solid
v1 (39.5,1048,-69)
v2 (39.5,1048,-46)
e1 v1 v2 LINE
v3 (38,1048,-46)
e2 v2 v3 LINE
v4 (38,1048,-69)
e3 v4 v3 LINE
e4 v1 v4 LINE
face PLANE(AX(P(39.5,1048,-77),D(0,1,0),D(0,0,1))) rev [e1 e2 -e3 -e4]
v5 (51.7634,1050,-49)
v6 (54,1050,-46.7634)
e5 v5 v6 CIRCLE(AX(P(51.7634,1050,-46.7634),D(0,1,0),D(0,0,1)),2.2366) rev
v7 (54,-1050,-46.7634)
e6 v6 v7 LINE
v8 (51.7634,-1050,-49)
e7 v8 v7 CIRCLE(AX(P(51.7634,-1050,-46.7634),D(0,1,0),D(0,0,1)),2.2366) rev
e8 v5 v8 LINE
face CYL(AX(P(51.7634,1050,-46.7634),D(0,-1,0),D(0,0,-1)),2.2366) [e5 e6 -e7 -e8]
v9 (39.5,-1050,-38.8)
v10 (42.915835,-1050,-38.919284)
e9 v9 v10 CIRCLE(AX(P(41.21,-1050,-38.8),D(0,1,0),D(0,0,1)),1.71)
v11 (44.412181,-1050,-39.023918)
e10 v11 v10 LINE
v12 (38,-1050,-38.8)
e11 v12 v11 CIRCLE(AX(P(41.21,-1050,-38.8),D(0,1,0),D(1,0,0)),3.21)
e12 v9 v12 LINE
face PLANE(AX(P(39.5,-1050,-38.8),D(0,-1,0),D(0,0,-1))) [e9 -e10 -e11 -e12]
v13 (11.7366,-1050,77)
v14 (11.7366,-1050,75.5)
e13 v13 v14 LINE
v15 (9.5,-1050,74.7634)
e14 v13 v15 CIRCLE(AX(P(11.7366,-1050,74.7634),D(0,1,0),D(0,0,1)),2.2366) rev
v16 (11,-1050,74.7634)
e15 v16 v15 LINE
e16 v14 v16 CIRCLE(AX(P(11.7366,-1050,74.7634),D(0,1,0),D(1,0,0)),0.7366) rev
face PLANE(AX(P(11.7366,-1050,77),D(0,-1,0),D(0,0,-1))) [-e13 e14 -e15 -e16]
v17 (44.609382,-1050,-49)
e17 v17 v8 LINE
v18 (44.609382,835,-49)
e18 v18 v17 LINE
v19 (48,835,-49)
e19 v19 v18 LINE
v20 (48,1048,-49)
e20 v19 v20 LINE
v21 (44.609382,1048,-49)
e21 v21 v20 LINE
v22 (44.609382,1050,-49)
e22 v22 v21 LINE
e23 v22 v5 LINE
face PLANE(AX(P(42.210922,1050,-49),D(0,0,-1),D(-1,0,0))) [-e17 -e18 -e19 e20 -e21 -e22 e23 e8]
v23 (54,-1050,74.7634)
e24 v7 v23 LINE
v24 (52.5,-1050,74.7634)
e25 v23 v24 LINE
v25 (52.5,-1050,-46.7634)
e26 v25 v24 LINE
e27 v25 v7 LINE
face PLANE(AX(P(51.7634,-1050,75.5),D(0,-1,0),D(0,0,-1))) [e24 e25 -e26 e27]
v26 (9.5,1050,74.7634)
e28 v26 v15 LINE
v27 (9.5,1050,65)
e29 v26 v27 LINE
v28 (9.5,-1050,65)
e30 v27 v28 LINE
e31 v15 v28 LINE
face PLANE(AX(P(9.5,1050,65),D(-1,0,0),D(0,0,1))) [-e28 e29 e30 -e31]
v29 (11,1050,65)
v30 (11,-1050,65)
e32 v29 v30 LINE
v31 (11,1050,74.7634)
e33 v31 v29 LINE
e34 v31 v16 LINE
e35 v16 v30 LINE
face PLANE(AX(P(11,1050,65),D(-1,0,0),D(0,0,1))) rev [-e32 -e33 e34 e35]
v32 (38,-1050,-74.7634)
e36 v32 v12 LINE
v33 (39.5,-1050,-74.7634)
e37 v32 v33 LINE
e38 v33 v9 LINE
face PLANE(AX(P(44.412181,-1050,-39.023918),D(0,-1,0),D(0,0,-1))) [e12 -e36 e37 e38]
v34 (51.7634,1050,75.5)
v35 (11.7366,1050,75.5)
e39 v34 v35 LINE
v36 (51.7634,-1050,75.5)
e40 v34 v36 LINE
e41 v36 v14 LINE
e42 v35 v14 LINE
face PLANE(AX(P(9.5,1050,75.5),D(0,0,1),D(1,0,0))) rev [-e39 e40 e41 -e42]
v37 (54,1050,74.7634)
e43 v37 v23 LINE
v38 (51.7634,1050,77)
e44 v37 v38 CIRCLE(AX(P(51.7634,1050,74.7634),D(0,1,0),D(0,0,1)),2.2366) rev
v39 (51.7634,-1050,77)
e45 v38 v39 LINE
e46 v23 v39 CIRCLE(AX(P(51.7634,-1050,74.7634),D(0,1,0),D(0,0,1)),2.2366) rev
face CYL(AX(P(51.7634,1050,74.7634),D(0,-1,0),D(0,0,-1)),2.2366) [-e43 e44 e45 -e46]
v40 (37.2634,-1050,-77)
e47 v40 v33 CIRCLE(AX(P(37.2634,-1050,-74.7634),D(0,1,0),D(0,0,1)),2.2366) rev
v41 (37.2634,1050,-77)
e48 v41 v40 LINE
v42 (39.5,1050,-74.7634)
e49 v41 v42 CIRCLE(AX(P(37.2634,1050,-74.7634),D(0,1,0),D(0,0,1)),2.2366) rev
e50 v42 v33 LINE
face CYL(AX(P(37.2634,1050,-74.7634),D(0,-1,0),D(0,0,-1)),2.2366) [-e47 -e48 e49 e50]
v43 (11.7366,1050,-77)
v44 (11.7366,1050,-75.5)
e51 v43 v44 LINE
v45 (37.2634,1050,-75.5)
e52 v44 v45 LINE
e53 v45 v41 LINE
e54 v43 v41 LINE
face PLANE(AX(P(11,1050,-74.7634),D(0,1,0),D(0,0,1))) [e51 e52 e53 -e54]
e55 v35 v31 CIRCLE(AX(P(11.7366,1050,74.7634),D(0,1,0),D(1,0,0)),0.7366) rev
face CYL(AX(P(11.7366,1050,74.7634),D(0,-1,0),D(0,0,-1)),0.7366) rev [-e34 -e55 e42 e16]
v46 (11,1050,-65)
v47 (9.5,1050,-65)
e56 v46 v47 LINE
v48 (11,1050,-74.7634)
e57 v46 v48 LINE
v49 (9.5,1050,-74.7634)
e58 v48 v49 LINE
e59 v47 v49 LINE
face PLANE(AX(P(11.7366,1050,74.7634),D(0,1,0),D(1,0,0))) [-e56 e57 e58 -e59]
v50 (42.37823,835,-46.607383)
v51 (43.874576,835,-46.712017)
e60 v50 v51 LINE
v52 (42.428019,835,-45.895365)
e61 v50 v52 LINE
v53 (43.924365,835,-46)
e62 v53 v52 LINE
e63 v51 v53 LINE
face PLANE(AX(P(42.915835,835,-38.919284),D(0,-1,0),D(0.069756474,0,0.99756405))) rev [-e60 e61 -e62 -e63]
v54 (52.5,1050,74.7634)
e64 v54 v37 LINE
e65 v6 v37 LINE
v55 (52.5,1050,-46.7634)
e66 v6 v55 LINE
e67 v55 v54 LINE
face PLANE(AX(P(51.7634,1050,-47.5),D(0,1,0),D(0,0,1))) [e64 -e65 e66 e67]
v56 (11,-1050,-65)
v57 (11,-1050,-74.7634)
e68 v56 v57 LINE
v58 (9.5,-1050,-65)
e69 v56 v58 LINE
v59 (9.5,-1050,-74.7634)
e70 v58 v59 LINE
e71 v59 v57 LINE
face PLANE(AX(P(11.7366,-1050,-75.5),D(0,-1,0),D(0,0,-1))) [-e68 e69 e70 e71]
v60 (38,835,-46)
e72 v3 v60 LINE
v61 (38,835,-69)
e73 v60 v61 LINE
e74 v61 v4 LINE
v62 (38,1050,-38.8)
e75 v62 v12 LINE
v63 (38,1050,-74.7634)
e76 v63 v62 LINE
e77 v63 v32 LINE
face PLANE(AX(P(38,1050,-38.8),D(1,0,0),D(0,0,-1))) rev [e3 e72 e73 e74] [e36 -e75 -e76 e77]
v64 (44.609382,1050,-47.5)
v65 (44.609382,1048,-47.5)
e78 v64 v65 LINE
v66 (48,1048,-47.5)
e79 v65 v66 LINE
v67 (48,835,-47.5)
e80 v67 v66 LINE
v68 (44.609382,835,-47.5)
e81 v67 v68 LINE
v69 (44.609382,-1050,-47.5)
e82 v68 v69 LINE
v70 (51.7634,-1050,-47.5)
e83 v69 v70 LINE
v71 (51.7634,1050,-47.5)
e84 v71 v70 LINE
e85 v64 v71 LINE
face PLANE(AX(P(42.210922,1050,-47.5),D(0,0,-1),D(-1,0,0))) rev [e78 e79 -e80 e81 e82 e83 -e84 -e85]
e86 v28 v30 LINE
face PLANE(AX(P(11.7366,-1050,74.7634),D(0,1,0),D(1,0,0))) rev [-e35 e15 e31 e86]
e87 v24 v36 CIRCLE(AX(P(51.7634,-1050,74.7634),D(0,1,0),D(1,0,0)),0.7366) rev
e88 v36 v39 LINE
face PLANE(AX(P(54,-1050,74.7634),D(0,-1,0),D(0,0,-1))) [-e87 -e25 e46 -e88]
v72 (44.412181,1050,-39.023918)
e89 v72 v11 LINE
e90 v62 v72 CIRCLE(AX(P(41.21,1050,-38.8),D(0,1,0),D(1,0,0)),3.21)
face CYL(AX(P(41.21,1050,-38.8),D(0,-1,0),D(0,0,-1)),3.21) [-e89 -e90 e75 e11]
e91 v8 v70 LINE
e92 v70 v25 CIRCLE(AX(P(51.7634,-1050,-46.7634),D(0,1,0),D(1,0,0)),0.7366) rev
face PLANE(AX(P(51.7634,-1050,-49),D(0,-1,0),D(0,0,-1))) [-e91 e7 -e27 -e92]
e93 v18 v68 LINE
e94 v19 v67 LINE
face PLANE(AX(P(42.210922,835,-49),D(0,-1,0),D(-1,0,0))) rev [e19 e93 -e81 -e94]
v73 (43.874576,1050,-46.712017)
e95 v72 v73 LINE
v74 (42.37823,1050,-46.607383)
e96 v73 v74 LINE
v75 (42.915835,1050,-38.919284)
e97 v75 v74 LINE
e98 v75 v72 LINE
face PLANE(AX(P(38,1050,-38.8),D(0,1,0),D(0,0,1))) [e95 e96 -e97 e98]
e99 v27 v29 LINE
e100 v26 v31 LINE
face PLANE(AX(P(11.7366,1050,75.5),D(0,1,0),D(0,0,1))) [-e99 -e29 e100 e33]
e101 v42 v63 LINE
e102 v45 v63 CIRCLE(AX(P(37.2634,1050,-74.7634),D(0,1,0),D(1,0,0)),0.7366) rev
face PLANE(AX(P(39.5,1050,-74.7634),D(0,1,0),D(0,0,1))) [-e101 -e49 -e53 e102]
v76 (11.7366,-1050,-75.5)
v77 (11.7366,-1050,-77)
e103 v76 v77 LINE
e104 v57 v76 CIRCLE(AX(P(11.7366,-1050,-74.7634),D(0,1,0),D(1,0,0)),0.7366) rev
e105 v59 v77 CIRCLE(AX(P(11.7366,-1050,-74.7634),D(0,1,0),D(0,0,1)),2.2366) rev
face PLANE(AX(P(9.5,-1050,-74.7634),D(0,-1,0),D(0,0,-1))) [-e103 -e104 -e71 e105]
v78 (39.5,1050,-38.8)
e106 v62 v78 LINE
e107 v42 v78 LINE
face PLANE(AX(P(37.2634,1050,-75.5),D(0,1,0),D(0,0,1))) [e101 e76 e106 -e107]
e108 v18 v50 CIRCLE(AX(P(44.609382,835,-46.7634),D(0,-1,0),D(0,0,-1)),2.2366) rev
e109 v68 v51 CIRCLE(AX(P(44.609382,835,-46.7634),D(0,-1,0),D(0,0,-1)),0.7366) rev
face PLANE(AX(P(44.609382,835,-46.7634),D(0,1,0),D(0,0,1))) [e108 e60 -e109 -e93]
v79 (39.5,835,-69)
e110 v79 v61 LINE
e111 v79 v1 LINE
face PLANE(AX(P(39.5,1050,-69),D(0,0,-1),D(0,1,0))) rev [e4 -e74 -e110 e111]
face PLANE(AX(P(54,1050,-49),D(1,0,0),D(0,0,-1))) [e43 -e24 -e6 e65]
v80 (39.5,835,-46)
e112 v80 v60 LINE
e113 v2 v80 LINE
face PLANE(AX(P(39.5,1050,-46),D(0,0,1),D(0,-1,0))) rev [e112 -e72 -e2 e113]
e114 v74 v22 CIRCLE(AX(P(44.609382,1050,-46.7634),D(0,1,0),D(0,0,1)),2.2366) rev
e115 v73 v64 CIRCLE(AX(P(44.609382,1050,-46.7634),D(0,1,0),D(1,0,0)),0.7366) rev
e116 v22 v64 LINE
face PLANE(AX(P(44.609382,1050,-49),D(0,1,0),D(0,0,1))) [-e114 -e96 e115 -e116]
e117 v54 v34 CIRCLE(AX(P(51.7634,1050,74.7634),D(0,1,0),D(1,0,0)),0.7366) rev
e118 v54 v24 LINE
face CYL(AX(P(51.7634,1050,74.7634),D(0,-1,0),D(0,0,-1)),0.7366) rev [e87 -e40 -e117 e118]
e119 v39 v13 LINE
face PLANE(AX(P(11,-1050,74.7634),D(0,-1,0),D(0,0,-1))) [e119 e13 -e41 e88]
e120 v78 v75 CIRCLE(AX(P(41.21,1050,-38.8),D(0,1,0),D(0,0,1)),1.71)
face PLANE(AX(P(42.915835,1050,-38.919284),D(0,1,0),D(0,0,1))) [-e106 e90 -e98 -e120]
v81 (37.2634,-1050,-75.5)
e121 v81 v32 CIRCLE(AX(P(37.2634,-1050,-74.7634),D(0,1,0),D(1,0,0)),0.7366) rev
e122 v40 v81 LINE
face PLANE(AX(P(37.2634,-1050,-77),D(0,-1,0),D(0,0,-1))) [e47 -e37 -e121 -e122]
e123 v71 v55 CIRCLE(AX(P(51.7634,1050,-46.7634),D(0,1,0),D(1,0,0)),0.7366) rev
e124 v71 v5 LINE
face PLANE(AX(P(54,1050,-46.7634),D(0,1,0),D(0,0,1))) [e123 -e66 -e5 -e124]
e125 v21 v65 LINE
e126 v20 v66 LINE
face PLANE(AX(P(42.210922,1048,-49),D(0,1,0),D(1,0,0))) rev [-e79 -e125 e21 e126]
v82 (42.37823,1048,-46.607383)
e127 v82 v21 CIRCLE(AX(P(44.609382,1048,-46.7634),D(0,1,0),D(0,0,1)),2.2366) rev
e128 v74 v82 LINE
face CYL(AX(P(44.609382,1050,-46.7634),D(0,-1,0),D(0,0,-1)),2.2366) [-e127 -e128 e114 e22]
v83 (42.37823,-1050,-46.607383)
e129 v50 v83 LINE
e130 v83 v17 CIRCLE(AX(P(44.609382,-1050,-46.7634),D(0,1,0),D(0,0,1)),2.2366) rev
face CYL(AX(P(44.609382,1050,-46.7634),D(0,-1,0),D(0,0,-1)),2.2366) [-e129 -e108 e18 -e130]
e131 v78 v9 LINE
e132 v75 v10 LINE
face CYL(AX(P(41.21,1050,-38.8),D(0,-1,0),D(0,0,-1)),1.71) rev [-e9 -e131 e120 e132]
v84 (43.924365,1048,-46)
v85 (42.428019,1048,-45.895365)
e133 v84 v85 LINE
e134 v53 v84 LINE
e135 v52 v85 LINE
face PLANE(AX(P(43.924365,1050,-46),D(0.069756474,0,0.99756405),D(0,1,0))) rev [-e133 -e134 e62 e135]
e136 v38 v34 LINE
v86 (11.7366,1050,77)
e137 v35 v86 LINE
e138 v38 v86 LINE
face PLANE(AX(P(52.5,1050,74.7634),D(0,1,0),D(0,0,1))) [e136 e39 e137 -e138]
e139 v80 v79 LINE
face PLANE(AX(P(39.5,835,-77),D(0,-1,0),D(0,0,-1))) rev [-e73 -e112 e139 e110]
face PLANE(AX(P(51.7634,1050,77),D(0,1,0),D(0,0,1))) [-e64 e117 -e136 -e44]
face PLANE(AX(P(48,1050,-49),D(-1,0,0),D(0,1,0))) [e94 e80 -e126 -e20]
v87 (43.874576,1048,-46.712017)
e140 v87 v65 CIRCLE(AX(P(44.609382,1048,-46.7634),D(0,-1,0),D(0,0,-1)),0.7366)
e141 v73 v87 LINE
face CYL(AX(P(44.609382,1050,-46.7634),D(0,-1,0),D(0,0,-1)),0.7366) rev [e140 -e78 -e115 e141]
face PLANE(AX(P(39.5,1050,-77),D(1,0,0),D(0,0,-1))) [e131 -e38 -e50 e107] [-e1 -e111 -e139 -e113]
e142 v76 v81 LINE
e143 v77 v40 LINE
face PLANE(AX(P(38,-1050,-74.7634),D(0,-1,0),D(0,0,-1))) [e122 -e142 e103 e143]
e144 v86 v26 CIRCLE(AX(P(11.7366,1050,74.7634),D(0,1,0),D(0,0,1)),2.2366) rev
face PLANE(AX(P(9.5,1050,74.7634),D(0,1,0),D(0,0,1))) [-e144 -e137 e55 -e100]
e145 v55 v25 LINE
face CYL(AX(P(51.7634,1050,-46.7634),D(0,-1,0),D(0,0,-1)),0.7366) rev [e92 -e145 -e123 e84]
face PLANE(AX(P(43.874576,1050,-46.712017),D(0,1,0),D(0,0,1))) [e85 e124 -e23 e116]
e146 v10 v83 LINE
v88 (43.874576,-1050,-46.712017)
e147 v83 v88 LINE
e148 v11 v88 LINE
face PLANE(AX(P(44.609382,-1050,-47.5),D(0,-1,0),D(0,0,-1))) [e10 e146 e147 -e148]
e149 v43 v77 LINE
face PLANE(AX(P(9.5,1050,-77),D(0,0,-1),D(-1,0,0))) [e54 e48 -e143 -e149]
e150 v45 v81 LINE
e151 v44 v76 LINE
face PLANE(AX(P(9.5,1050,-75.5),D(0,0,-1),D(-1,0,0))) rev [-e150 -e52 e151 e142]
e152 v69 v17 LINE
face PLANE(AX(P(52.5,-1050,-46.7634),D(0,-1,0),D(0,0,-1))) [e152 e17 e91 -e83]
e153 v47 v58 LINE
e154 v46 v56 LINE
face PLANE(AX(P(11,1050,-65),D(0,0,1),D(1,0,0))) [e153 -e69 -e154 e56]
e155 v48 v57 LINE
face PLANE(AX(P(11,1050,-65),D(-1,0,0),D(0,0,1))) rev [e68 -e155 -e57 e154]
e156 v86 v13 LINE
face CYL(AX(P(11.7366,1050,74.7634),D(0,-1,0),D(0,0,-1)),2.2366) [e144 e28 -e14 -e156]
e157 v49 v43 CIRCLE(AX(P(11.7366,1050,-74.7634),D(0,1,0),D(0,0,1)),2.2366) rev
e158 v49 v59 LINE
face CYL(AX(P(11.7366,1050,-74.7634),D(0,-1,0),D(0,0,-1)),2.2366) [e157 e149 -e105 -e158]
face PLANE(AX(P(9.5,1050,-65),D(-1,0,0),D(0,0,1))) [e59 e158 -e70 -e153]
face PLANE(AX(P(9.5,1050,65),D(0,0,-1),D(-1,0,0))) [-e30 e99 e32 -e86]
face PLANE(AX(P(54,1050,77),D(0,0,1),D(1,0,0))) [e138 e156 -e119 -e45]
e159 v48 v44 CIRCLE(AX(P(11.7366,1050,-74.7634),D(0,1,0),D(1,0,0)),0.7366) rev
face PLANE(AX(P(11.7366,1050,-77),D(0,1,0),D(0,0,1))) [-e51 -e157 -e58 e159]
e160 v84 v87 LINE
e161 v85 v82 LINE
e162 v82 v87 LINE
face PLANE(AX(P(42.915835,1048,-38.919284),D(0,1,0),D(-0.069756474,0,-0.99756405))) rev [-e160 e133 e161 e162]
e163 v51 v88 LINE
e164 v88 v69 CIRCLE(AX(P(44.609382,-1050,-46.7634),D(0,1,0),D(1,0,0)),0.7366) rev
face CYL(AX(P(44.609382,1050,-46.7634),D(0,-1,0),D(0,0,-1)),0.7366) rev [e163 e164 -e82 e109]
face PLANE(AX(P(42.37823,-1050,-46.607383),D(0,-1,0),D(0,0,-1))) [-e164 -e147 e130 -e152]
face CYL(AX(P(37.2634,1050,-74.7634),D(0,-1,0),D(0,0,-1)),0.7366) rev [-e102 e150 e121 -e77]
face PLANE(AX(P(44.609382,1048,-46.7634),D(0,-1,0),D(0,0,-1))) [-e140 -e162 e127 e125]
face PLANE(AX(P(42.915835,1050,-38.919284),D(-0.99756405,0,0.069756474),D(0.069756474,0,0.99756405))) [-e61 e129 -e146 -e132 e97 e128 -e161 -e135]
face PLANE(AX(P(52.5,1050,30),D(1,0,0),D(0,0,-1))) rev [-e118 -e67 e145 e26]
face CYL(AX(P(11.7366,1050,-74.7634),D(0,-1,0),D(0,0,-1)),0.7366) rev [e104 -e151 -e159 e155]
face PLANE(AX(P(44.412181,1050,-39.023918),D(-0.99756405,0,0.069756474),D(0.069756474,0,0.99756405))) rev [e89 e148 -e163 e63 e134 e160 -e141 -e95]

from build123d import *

# Parameters (mm, degrees)
BASE_FLANGE1_DEPTH     = 1050
CUT_EXTRUDE3_START     = 835
CUT_EXTRUDE3_OUTLINE_W = 1.5
CUT_EXTRUDE3_OUTLINE_H = 23
CUT_EXTRUDE3_DEPTH     = 213


# Read off the part's stored shape, not the designer's step: Cut-Extrude3
# Sheet-metal steps are written as plain solids
with BuildPart() as part:
    # Sketch1 → Base-Flange1 (new, symmetric)
    with BuildSketch(Plane(origin=(0, 0, 0), x_dir=(1, 0, 0), z_dir=(0, 1, 0))):
        with BuildLine():
            Line((9.5, 65), (9.5, 74.7634))
            ThreePointArc((9.5, 74.7634), (10.155084973, 76.344915027), (11.7366, 77))
            Line((11.7366, 77), (37.2634, 77))
            ThreePointArc((37.2634, 77), (38.844915027, 76.344915027), (39.5, 74.7634))
            Line((39.5, 74.7634), (39.5, 49))
            Line((39.5, 49), (39.5, 38.8))
            ThreePointArc((39.5, 38.8), (41.269678139, 37.091041686), (42.915834526, 38.91928357))
            Line((42.915834526, 38.91928357), (42.378230266, 46.607382671))
            ThreePointArc((42.378230266, 46.607382671), (42.973636332, 48.288757532), (44.609382021, 49))
            Line((44.609382021, 49), (51.7634, 49))
            ThreePointArc((51.7634, 49), (53.344915027, 48.344915027), (54, 46.7634))
            Line((54, 46.7634), (54, -30))
            Line((54, -30), (54, -74.7634))
            ThreePointArc((54, -74.7634), (53.344915027, -76.344915027), (51.7634, -77))
            Line((51.7634, -77), (39.5, -77))
            Line((39.5, -77), (11.7366, -77))
            ThreePointArc((11.7366, -77), (10.155084973, -76.344915027), (9.5, -74.7634))
            Line((9.5, -74.7634), (9.5, -65))
            Line((9.5, -65), (11, -65))
            Line((11, -65), (11, -74.7634))
            ThreePointArc((11, -74.7634), (11.215745145, -75.284254855), (11.7366, -75.5))
            Line((11.7366, -75.5), (39.5, -75.5))
            Line((39.5, -75.5), (51.7634, -75.5))
            ThreePointArc((51.7634, -75.5), (52.284254855, -75.284254855), (52.5, -74.7634))
            Line((52.5, -74.7634), (52.5, -30))
            Line((52.5, -30), (52.5, 46.7634))
            ThreePointArc((52.5, 46.7634), (52.284254855, 47.284254855), (51.7634, 47.5))
            Line((51.7634, 47.5), (44.609382021, 47.5))
            ThreePointArc((44.609382021, 47.5), (44.070666884, 47.265759992), (43.874576341, 46.712017381))
            Line((43.874576341, 46.712017381), (44.412180601, 39.023918281))
            ThreePointArc((44.412180601, 39.023918281), (41.322027384, 35.591955445), (38, 38.8))
            Line((38, 38.8), (38, 49))
            Line((38, 49), (38, 74.7634))
            ThreePointArc((38, 74.7634), (37.784254855, 75.284254855), (37.2634, 75.5))
            Line((37.2634, 75.5), (11.7366, 75.5))
            ThreePointArc((11.7366, 75.5), (11.215745145, 75.284254855), (11, 74.7634))
            Line((11, 74.7634), (11, 65))
            Line((11, 65), (9.5, 65))
        make_face()
    extrude(amount=BASE_FLANGE1_DEPTH, both=True)

    # Cut-Extrude3 outline → Cut-Extrude3 (cut)
    with BuildSketch(Plane(origin=(0, 0, 0), x_dir=(1, 0, 0), z_dir=(0, 1, 0)).offset(CUT_EXTRUDE3_START)):
        with Locations((38.75, 57.5)):
            Rectangle(CUT_EXTRUDE3_OUTLINE_W, CUT_EXTRUDE3_OUTLINE_H)
        with BuildLine():
            Line((48, 47.5), (48, 49))
            Line((48, 49), (44.609382021, 49))
            ThreePointArc((44.609382021, 49), (42.973636332, 48.288757532), (42.378230266, 46.607382671))
            Line((42.378230266, 46.607382671), (42.428019372, 45.895365289))
            Line((42.428019372, 45.895365289), (43.924365447, 46))
            Line((43.924365447, 46), (43.874576341, 46.712017381))
            ThreePointArc((43.874576341, 46.712017381), (44.070666884, 47.265759992), (44.609382021, 47.5))
            Line((44.609382021, 47.5), (48, 47.5))
        make_face()
    extrude(amount=CUT_EXTRUDE3_DEPTH, mode=Mode.SUBTRACT)


solid = part.part
